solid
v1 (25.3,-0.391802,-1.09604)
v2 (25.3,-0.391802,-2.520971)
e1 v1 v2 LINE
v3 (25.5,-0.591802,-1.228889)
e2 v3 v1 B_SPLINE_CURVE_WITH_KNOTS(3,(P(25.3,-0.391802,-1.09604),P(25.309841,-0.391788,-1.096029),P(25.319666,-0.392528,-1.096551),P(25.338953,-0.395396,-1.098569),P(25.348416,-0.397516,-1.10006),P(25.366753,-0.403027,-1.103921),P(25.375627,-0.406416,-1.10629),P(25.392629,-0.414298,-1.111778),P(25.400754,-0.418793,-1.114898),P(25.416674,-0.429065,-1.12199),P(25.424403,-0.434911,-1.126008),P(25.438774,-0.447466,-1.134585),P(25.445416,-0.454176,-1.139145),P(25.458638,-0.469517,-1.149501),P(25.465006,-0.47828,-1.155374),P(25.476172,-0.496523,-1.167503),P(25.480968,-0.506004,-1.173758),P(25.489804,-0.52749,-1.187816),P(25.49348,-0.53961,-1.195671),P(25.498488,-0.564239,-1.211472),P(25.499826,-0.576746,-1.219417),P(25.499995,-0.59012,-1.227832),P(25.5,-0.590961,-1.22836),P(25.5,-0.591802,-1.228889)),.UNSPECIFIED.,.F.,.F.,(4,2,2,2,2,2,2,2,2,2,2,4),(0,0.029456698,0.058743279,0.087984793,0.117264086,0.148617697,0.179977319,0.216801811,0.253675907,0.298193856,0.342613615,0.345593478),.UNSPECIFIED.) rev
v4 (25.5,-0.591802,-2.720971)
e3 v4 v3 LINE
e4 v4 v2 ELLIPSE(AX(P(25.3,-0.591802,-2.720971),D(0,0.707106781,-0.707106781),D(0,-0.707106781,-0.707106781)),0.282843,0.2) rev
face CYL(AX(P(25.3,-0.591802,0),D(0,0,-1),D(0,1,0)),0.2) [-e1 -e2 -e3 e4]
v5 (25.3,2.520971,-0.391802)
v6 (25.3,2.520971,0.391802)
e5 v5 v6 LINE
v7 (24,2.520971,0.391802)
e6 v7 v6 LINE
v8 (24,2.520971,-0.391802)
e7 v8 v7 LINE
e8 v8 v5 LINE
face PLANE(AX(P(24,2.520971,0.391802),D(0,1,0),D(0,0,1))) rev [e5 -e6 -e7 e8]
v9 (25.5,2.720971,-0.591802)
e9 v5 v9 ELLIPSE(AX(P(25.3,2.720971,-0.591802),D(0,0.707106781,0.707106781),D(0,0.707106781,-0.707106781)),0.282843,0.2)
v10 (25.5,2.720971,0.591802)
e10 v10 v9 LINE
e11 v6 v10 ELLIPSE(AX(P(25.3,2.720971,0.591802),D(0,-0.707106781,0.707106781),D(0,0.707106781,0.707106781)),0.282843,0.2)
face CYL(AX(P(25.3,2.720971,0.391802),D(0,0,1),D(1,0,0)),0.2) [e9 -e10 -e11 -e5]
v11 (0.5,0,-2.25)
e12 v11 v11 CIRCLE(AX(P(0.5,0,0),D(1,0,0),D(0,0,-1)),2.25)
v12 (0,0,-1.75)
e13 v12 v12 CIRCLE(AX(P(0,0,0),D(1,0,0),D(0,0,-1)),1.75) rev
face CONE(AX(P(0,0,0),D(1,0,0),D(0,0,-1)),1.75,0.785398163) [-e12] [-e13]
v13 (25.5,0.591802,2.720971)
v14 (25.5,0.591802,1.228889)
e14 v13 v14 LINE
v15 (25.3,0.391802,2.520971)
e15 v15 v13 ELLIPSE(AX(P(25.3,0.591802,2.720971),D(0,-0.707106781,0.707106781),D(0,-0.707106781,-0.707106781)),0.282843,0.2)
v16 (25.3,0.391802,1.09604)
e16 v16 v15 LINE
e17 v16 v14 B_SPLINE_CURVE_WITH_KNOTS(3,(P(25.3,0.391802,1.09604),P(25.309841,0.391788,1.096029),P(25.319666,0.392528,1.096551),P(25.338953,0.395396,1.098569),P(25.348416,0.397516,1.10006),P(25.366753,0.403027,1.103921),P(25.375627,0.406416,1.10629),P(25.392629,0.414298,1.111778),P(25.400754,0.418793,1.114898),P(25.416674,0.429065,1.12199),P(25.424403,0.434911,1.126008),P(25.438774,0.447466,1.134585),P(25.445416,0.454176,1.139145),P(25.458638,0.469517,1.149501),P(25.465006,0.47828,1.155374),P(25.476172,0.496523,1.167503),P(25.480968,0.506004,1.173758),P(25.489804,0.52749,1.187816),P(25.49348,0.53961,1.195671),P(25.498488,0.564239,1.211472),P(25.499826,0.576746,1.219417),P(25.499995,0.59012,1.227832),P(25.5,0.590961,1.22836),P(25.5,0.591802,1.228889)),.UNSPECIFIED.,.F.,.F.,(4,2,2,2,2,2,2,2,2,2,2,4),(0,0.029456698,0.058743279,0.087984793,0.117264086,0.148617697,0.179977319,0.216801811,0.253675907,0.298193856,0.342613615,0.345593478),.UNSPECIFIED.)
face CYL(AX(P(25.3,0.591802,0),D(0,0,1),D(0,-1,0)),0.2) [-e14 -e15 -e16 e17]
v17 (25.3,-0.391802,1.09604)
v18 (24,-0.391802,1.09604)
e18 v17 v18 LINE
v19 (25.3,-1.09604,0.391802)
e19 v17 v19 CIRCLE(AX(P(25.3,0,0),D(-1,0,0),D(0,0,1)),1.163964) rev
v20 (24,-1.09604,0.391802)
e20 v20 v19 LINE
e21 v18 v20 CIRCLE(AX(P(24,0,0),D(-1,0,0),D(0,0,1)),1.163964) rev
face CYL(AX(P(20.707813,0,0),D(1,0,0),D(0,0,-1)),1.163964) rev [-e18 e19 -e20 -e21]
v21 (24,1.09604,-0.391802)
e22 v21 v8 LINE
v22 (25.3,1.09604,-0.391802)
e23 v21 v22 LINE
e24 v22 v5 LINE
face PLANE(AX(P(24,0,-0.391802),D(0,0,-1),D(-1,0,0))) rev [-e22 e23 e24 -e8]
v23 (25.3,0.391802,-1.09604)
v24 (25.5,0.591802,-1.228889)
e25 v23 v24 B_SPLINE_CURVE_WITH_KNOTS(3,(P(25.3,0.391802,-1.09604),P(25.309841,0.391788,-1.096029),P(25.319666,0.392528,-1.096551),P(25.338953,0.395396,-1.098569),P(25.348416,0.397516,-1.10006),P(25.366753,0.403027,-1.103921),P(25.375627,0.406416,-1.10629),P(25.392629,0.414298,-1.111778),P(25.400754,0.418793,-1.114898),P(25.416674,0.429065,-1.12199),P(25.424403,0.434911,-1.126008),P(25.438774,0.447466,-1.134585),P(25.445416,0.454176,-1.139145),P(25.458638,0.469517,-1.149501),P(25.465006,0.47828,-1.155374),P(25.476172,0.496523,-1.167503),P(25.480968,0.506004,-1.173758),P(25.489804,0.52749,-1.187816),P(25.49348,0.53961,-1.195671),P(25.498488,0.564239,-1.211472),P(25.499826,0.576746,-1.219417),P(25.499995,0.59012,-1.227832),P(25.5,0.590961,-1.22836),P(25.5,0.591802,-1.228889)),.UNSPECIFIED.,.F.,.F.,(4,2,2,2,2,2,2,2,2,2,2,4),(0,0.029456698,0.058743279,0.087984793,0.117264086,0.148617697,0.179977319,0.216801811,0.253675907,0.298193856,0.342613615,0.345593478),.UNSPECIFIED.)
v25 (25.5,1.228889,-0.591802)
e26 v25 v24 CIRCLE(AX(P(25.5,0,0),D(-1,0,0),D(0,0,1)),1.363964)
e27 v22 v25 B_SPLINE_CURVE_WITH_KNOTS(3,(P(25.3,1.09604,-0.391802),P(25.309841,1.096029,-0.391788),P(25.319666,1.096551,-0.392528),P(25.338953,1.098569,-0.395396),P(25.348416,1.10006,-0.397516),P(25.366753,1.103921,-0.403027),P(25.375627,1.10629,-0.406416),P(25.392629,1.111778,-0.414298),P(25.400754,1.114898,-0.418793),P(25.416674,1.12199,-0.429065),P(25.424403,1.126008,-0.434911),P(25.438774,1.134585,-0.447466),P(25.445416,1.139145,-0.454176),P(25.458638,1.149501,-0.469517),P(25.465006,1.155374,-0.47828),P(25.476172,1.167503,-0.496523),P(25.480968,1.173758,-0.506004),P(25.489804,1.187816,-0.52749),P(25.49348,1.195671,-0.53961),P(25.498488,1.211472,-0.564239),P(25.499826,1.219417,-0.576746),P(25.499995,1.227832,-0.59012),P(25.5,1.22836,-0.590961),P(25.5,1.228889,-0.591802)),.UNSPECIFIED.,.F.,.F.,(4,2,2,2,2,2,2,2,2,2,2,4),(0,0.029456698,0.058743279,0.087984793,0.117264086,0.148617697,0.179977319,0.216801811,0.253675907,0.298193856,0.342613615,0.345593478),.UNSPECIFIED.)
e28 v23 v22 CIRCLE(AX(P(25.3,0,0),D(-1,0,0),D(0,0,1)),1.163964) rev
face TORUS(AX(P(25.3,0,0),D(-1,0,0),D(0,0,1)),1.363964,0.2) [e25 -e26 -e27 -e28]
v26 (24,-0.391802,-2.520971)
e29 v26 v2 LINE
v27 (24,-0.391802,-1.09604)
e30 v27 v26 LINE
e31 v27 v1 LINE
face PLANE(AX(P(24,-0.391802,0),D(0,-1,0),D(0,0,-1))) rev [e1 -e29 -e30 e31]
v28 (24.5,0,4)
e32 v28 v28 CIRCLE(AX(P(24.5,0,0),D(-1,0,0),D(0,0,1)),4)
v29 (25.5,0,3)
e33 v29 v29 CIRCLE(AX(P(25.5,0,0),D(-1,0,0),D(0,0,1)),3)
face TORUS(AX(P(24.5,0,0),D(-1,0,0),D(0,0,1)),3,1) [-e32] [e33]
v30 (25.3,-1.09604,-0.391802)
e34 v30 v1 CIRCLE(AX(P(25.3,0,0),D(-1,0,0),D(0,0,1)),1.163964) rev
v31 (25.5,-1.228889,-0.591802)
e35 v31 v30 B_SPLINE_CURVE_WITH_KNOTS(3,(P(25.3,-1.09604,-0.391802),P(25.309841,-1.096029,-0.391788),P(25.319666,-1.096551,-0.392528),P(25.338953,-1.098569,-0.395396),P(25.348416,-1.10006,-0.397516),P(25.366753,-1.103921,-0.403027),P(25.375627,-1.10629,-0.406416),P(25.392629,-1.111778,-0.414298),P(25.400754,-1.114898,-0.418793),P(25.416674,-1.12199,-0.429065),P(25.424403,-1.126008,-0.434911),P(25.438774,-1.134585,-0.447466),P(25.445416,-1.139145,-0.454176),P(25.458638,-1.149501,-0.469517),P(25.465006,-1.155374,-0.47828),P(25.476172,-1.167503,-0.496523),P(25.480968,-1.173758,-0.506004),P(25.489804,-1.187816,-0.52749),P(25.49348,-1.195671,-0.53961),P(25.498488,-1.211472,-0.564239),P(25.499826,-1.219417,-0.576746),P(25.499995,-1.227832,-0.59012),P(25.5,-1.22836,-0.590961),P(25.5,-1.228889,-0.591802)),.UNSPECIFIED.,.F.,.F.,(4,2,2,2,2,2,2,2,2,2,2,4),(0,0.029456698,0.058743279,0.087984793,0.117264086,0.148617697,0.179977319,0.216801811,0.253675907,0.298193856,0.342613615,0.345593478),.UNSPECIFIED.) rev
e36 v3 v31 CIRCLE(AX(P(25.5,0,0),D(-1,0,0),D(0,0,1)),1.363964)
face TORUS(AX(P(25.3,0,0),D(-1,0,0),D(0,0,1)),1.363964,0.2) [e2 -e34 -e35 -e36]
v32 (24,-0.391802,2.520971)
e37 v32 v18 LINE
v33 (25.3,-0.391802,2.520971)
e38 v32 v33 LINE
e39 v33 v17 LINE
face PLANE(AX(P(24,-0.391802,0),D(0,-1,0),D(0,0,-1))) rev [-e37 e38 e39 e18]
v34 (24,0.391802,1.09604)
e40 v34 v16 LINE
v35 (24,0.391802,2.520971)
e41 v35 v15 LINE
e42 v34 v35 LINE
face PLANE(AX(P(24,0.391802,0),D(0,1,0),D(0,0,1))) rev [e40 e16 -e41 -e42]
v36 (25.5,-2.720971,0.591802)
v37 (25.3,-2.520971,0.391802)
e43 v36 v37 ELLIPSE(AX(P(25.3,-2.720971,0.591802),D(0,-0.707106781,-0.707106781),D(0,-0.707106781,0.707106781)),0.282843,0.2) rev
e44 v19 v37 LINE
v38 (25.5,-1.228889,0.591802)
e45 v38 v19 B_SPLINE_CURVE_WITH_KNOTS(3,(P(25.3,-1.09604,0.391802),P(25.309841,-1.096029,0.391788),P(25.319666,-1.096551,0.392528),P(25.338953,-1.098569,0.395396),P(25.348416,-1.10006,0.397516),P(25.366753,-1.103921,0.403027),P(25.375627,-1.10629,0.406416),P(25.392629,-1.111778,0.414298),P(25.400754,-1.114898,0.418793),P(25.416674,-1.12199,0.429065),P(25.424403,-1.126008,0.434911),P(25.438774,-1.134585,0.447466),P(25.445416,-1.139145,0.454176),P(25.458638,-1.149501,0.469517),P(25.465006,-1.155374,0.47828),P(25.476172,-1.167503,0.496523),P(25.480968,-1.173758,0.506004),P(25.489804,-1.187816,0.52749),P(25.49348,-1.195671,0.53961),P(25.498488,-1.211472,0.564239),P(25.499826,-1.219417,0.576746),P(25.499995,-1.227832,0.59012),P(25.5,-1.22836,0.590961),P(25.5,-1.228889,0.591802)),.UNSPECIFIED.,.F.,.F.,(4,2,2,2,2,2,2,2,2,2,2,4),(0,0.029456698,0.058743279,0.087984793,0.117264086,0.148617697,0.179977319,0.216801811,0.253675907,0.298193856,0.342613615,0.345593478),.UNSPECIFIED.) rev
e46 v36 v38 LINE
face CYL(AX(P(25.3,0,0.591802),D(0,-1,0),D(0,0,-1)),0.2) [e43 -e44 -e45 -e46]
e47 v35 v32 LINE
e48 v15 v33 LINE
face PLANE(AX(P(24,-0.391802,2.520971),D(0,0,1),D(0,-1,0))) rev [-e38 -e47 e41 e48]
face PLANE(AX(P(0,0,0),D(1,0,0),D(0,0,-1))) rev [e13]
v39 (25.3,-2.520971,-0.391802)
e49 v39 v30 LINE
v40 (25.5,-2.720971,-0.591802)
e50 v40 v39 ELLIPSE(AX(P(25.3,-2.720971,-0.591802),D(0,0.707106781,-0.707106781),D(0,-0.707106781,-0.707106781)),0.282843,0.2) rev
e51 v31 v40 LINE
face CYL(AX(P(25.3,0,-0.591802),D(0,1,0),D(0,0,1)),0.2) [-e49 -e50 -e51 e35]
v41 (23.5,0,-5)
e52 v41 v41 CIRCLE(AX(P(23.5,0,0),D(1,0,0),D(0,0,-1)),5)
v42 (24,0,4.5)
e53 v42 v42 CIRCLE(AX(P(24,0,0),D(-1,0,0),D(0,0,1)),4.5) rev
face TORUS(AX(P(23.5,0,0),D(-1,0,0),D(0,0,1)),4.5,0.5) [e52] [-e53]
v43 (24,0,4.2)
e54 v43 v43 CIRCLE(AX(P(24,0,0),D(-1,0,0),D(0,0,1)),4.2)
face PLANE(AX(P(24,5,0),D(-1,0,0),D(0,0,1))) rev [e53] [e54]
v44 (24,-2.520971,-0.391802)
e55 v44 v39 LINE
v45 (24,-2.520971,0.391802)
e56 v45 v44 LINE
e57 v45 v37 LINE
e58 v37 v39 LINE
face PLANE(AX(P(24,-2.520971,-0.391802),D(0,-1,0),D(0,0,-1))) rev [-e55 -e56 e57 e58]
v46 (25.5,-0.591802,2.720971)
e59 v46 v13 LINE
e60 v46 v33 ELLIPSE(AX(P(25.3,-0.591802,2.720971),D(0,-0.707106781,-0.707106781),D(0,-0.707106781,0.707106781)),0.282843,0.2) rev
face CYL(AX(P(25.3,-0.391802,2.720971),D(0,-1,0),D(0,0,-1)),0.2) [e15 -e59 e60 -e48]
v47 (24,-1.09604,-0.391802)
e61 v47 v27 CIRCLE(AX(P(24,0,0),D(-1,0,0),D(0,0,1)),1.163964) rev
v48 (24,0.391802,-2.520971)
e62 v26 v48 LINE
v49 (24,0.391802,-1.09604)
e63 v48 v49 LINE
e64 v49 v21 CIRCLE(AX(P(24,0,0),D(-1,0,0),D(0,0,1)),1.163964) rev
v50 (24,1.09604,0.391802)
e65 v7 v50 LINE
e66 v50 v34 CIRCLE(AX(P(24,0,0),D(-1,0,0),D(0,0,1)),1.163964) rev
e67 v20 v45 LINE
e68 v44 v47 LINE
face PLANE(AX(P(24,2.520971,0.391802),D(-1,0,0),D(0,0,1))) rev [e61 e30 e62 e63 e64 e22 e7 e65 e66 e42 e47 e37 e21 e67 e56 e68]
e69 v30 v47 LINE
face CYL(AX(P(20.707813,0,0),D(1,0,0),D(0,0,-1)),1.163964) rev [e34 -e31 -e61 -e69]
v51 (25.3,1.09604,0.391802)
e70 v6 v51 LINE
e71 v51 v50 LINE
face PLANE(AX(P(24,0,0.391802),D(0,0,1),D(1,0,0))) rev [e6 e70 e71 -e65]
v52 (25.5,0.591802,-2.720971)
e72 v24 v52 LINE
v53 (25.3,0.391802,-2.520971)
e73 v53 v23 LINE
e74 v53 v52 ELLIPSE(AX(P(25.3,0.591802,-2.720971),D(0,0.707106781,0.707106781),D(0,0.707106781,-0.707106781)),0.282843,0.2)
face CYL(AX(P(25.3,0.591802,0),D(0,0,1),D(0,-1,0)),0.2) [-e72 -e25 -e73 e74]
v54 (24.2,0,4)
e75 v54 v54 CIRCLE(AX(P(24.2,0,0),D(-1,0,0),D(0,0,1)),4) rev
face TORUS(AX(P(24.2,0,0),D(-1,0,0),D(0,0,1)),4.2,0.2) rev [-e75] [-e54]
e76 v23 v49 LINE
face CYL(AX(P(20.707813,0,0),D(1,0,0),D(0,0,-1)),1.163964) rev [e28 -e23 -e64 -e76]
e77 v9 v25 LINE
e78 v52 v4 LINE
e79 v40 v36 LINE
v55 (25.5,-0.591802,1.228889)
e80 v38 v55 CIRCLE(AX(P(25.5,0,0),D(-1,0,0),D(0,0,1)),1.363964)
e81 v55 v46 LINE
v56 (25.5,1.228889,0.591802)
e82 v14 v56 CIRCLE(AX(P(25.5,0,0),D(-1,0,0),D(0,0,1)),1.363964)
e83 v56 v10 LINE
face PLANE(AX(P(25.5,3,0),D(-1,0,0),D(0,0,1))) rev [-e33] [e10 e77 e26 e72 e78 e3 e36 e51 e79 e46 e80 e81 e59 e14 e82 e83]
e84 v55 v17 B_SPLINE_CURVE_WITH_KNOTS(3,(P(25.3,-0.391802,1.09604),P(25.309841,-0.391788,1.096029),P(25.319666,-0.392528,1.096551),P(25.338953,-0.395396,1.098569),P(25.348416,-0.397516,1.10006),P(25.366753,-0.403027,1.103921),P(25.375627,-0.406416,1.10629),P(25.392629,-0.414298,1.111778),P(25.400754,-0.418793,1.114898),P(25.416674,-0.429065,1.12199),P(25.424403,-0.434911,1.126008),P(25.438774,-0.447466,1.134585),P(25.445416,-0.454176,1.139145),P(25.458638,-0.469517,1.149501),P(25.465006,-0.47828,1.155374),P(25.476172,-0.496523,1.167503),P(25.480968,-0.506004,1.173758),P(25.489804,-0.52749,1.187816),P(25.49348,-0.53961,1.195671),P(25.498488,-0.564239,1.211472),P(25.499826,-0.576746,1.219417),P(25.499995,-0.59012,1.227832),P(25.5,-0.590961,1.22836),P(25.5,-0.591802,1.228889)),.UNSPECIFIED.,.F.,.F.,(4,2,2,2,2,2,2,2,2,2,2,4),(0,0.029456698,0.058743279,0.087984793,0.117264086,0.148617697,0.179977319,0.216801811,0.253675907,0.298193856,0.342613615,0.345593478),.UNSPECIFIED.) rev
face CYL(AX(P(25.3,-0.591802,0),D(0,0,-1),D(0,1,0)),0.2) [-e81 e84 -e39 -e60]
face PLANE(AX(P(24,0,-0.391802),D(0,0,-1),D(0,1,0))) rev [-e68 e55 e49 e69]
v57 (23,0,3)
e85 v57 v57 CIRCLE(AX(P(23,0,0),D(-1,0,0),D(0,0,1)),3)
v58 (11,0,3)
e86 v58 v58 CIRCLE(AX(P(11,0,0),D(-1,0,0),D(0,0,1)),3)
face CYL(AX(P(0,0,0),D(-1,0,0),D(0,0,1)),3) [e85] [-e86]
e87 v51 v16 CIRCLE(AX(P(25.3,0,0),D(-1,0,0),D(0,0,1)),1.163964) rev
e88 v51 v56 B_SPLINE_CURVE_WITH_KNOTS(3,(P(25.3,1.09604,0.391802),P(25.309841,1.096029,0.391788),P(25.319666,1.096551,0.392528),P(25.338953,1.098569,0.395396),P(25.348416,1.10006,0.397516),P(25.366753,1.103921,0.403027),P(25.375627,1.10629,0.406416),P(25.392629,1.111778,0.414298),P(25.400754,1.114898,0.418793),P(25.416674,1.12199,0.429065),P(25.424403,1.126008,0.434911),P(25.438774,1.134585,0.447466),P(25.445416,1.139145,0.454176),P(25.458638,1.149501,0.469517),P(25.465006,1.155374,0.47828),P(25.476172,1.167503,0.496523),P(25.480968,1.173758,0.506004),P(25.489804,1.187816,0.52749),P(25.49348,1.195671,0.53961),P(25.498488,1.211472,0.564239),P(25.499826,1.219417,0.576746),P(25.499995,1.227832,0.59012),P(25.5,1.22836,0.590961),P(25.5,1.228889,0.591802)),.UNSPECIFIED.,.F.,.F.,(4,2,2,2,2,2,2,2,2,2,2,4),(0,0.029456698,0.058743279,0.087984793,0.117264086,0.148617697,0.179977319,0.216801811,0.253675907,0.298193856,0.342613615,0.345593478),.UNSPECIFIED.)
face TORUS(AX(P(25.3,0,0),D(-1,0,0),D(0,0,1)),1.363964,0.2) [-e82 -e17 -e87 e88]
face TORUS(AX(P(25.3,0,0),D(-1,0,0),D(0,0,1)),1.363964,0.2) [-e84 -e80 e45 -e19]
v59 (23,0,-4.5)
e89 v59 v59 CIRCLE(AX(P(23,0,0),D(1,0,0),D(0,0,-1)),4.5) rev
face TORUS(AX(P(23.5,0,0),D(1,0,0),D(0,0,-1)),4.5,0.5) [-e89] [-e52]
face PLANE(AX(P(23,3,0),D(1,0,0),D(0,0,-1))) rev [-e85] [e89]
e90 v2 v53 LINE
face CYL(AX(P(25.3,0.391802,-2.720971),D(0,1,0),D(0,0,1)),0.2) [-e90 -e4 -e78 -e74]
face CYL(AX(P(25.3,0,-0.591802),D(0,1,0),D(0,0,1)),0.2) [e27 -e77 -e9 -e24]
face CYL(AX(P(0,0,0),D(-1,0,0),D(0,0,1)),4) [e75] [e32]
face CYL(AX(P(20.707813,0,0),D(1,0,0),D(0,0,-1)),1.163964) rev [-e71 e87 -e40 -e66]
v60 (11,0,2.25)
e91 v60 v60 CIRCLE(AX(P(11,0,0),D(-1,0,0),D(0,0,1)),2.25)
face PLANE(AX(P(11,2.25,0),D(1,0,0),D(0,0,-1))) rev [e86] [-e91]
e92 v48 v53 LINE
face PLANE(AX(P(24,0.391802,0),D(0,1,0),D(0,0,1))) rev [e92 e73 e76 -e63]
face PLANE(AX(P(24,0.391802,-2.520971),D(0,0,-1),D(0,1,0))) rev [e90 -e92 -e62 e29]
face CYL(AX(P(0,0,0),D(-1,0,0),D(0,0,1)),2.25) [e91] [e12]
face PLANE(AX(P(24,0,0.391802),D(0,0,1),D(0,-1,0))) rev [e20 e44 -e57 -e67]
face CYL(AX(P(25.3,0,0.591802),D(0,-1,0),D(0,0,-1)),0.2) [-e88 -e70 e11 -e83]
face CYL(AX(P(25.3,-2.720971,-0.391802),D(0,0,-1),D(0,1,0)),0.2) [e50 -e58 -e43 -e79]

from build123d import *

# Parameters (mm, degrees)
CONG_1_R                     = 0.5
CONG_2_R                     = 0.2
ESQUISSE2_W                  = 0.783604582
ESQUISSE2_H                  = 2.520970871
ENL_V_MAT_EXTRU_1_DEPTH      = 1.5
R_P_TITION_CIRCULAIRE1_COUNT = 4
ESQUISSE3_R                  = 1.163963939
ENL_V_MAT_EXTRU_2_DEPTH      = 1.5
CONG_3_R                     = 0.2
CHANFREIN1_SIZE              = 0.5


with BuildPart() as part:
    # Esquisse1 → Révolution1 (revolve)
    with BuildSketch(Plane.XY, mode=Mode.PRIVATE) as r_volution1_sk:
        with BuildLine():
            Line((0, 0), (0, 2.25))
            Line((0, 2.25), (11, 2.25))
            Line((11, 2.25), (11, 3))
            Line((11, 3), (23, 3))
            Line((23, 3), (23, 5))
            Line((23, 5), (24, 5))
            Line((24, 5), (24, 4))
            Line((24, 4), (24.5, 4))
            ThreePointArc((24.5, 4), (25.207106781, 3.707106781), (25.5, 3))
            Line((25.5, 3), (25.5, 0))
            Line((25.5, 0), (0, 0))
        make_face()
    revolve(r_volution1_sk.sketch.rotate(Axis((0, 0, 0), (1, 0, 0)), 90), axis=Axis((0, 0, 0), (1, 0, 0)))

    # Congé1
    # the kernel refuses this fillet: 0.5 mm, written as the material it takes off along each edge
    with BuildSketch(Plane(origin=(23, 0, 0), x_dir=(0, 0, 1), z_dir=(0, 1, 0))) as cong_1_piece_1:
        with BuildLine():
            CenterArc((5 - CONG_1_R, CONG_1_R), CONG_1_R, 270, 90)
            Line((5, CONG_1_R), (5 + CONG_1_R * 0.02, CONG_1_R))
            Line((5 + CONG_1_R * 0.02, CONG_1_R), (5 + CONG_1_R * 0.02, -CONG_1_R * 0.02))
            Line((5 + CONG_1_R * 0.02, -CONG_1_R * 0.02), (5 - CONG_1_R, -CONG_1_R * 0.02))
            Line((5 - CONG_1_R, -CONG_1_R * 0.02), (5 - CONG_1_R, 0))
        make_face()
    revolve(axis=Axis((23, 0, 0), (1, 0, 0)), mode=Mode.SUBTRACT)
    with BuildSketch(Plane(origin=(24, 0, 0), x_dir=(0, 0, 1), z_dir=(0, 1, 0))) as cong_1_piece_2:
        with BuildLine():
            CenterArc((5 - CONG_1_R, -CONG_1_R), CONG_1_R, 0, 90)
            Line((5 - CONG_1_R, 0), (5 - CONG_1_R, CONG_1_R * 0.02))
            Line((5 - CONG_1_R, CONG_1_R * 0.02), (5 + CONG_1_R * 0.02, CONG_1_R * 0.02))
            Line((5 + CONG_1_R * 0.02, CONG_1_R * 0.02), (5 + CONG_1_R * 0.02, -CONG_1_R))
            Line((5 + CONG_1_R * 0.02, -CONG_1_R), (5, -CONG_1_R))
        make_face()
    revolve(axis=Axis((24, 0, 0), (1, 0, 0)), mode=Mode.SUBTRACT)

    # Congé2
    cong_2_edges = [part.edges().sort_by_distance(p)[0] for p in [
        (24, 0, -4),
    ]]
    fillet(cong_2_edges, radius=CONG_2_R)

    # Esquisse2 → Enlèv. mat.-Extru.1 (cut)
    with BuildSketch(Plane(origin=(25.5, 0, 0), x_dir=(0, 0, -1), z_dir=(1, 0, 0))):
        with Locations((0, 1.260485436)):
            Rectangle(ESQUISSE2_W, ESQUISSE2_H)
    enl_v_mat_extru_1 = extrude(amount=-ENL_V_MAT_EXTRU_1_DEPTH, mode=Mode.SUBTRACT)

    # Répétition circulaire1: Enlèv. mat.-Extru.1 ×4 about axis
    r_p_tition_circulaire1_axis = Axis((0, 0, 0), (1, 0, 0))
    for i in range(1, R_P_TITION_CIRCULAIRE1_COUNT):
        add(enl_v_mat_extru_1.rotate(r_p_tition_circulaire1_axis, i * 360 / R_P_TITION_CIRCULAIRE1_COUNT), mode=Mode.SUBTRACT)

    # Esquisse3 → Enlèv. mat.-Extru.2 (cut)
    with BuildSketch(Plane(origin=(25.5, 0, 0), x_dir=(0, 0, -1), z_dir=(1, 0, 0))):
        Circle(ESQUISSE3_R)
    extrude(amount=-ENL_V_MAT_EXTRU_2_DEPTH, mode=Mode.SUBTRACT)

    # Congé3
    cong_3_edges = [part.edges().sort_by_distance(p)[0] for p in [
        (25.5, 0, 2.520970871),
        (25.5, -0.391802291, 1.808505284),
        (25.5, -0.823046794, 0.823046794),
        (25.5, -1.808505284, 0.391802291),
        (25.5, -2.520970871, 0),
        (25.5, -1.808505284, -0.391802291),
        (25.5, -0.823046794, -0.823046794),
        (25.5, -0.391802291, -1.808505284),
        (25.5, 0, -2.520970871),
        (25.5, 0.391802291, -1.808505284),
        (25.5, 0.823046794, -0.823046794),
        (25.5, 1.808505284, -0.391802291),
        (25.5, 2.520970871, 0),
        (25.5, 1.808505284, 0.391802291),
        (25.5, 0.823046794, 0.823046794),
        (25.5, 0.391802291, 1.808505284),
    ]]
    fillet(cong_3_edges, radius=CONG_3_R)

    # Chanfrein1
    chanfrein1_edges = [part.edges().sort_by_distance(p)[0] for p in [
        (0, 0, -2.25),
    ]]
    chamfer(chanfrein1_edges, length=CHANFREIN1_SIZE)


solid = part.part
